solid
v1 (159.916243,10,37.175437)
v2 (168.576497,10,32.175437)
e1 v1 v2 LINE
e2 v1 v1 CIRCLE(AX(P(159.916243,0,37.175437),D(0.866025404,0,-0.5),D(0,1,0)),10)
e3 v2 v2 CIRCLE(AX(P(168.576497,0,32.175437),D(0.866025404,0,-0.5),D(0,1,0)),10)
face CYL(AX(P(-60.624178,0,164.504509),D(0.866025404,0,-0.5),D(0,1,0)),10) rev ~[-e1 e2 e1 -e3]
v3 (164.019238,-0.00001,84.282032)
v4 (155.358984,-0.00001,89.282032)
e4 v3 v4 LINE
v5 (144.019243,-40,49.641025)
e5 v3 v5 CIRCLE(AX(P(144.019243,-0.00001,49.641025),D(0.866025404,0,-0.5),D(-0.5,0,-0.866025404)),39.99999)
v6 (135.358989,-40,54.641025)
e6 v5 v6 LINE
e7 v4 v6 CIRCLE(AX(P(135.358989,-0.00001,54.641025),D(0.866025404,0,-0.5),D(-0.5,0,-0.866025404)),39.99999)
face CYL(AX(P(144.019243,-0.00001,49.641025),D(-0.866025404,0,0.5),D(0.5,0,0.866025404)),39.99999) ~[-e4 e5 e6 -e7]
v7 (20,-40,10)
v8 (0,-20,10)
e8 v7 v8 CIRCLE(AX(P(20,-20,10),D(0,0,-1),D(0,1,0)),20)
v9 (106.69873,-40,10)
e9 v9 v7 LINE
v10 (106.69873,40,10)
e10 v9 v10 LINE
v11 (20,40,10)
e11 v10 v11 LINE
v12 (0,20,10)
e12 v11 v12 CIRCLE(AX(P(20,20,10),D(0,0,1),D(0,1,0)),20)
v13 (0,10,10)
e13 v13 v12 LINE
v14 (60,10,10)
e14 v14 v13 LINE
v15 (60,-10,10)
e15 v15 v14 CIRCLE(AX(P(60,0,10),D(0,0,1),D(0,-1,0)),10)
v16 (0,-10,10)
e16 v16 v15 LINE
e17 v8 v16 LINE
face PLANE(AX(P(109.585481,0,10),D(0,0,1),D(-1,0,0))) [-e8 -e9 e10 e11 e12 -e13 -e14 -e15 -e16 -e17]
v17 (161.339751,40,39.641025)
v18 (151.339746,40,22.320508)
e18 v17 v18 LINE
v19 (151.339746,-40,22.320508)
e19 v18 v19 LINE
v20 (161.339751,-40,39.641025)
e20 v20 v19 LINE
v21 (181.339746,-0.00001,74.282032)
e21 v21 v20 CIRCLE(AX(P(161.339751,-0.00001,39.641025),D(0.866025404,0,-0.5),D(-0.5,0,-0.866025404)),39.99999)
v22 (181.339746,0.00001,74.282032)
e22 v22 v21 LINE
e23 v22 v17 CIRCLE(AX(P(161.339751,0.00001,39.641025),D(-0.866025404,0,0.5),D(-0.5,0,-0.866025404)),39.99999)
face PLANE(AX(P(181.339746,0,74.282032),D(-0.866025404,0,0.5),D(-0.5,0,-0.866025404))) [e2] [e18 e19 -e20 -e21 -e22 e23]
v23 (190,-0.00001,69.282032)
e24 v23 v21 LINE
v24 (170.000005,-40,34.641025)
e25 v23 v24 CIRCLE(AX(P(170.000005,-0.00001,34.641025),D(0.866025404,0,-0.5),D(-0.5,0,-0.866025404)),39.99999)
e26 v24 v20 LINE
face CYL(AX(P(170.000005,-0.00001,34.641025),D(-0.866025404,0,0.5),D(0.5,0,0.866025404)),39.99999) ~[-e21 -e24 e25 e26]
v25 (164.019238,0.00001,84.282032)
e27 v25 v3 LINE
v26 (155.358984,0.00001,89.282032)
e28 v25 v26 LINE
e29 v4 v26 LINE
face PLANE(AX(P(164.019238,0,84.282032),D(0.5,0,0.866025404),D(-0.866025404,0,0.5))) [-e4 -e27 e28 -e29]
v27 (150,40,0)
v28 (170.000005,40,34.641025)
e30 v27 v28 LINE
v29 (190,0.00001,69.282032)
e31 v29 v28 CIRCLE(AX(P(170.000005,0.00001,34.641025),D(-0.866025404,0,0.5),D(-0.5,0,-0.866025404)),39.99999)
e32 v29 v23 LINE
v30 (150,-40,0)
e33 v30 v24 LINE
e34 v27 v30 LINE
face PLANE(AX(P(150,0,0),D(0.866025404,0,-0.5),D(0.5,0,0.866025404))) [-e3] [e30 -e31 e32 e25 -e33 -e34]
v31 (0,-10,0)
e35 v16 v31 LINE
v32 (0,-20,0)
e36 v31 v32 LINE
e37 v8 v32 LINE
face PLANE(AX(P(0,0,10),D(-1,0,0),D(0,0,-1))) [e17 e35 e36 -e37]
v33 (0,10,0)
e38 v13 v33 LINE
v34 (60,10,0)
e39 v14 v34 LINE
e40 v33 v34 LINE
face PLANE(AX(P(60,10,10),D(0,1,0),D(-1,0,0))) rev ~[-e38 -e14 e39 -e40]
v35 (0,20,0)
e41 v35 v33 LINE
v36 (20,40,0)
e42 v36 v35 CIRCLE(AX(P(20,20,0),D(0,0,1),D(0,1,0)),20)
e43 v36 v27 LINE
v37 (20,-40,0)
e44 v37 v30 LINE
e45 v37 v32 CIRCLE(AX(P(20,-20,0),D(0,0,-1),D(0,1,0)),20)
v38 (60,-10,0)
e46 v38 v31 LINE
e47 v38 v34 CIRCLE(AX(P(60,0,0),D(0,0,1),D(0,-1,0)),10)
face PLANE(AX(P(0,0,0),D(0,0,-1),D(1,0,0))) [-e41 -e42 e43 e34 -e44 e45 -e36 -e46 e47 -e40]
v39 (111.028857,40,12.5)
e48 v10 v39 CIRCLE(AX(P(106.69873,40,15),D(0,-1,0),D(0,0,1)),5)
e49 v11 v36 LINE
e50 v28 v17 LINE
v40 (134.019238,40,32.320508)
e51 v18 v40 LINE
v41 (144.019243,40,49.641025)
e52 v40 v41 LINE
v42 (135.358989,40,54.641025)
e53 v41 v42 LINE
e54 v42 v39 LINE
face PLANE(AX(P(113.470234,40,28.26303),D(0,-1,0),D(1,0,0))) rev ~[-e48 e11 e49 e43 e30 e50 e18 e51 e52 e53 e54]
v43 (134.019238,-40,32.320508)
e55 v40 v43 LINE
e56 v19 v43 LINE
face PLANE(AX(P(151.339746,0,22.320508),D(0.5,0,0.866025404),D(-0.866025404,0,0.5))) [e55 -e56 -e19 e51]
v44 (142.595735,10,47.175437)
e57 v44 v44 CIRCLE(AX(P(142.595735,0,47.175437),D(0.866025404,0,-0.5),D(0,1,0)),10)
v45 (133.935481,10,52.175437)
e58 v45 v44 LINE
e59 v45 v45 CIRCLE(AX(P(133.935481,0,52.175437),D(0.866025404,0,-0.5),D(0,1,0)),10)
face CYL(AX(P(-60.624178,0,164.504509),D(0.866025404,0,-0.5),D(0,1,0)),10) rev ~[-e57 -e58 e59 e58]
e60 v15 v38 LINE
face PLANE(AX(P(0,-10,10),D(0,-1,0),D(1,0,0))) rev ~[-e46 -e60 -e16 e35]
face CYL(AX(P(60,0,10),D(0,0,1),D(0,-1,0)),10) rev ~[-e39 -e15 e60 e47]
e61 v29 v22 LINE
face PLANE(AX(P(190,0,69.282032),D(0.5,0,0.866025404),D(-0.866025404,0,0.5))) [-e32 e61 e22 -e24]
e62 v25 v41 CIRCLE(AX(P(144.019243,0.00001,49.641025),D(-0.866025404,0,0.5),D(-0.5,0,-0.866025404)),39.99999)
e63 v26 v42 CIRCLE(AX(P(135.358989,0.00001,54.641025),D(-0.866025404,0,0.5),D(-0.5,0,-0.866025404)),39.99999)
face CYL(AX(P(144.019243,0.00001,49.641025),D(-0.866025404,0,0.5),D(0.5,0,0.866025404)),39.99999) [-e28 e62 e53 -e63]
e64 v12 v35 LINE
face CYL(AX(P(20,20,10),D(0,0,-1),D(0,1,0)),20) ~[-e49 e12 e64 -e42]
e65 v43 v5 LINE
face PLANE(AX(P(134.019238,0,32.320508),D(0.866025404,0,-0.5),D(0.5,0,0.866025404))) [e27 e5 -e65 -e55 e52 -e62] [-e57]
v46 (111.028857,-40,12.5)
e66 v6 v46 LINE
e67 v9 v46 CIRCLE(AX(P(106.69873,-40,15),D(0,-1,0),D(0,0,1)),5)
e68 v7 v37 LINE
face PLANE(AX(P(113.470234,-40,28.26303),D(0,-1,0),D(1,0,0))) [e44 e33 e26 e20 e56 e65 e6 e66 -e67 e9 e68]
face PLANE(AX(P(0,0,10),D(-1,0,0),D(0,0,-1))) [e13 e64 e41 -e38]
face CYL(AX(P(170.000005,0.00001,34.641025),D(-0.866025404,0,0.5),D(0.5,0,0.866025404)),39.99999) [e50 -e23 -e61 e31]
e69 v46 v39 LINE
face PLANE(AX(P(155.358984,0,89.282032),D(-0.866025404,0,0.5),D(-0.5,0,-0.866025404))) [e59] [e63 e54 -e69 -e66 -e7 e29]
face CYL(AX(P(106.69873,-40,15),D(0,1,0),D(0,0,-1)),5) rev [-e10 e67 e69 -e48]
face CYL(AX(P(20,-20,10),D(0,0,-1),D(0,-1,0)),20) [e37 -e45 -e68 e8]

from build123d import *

# Parameters (mm, degrees)
F1_DEPTH = 40
F2_R     = 39.99999
F3_R     = 20
F5_D     = 20
F6_R     = 5
F8_DEPTH = 10.001


# Not quite as in the source:
# - a fillet or chamfer is up to 0.001 mm smaller than in the source, because OpenCascade refuses the exact size


with BuildPart() as f1:
    # F0 (on Front) → F1 (new body, symmetric)
    with BuildSketch(Plane.XZ):
        Polygon((0, 10), (0, 0), (150, 0), (190, 69.2820323028), (181.3397459622, 74.2820323028), (151.3397459622, 22.3205080757), (134.0192378865, 32.3205080757), (164.0192378865, 84.2820323028), (155.3589838486, 89.2820323028), (109.5854811567, 10), align=None)
    extrude(amount=F1_DEPTH, both=True)

    # F2 (radius 40 in the source; OpenCascade refuses exactly that, so slightly less here)
    f2_edges = [f1.edges().sort_by_distance(p)[0] for p in [
        (159.689111, -40, 86.782032),
        (159.689111, 40, 86.782032),
        (185.669873, 40, 71.782032),
        (185.669873, -40, 71.782032),
    ]]
    fillet(f2_edges, radius=F2_R)

    # F3
    f3_edges = [f1.edges().sort_by_distance(p)[0] for p in [
        (0, -40, 5),
        (0, 40, 5),
    ]]
    fillet(f3_edges, radius=F3_R)

    # F5 (through all)
    with Locations(Plane(origin=(77.8589838486, 0, -44.9519052838), x_dir=(0, -1, 0), z_dir=(-0.8660254038, 0, 0.5))):
        with Locations((0, 112.1529946162)):
            Hole(F5_D / 2)

    # F6
    f6_edges = [f1.edges().sort_by_distance(p)[0] for p in [
        (109.585481, 0, 10),
    ]]
    fillet(f6_edges, radius=F6_R)

    # F7 (on face) → F8 (cut, through all)
    with BuildSketch(Plane.XY.offset(10)):
        with BuildLine():
            Line((0, 0), (0, -10))
            Line((0, -10), (60, -10))
            ThreePointArc((60, -10), (70, 0), (60, 10))
            Line((60, 10), (0, 10))
            Line((0, 10), (0, 0))
        make_face()
    extrude(amount=-F8_DEPTH, mode=Mode.SUBTRACT)


solid = f1.part
